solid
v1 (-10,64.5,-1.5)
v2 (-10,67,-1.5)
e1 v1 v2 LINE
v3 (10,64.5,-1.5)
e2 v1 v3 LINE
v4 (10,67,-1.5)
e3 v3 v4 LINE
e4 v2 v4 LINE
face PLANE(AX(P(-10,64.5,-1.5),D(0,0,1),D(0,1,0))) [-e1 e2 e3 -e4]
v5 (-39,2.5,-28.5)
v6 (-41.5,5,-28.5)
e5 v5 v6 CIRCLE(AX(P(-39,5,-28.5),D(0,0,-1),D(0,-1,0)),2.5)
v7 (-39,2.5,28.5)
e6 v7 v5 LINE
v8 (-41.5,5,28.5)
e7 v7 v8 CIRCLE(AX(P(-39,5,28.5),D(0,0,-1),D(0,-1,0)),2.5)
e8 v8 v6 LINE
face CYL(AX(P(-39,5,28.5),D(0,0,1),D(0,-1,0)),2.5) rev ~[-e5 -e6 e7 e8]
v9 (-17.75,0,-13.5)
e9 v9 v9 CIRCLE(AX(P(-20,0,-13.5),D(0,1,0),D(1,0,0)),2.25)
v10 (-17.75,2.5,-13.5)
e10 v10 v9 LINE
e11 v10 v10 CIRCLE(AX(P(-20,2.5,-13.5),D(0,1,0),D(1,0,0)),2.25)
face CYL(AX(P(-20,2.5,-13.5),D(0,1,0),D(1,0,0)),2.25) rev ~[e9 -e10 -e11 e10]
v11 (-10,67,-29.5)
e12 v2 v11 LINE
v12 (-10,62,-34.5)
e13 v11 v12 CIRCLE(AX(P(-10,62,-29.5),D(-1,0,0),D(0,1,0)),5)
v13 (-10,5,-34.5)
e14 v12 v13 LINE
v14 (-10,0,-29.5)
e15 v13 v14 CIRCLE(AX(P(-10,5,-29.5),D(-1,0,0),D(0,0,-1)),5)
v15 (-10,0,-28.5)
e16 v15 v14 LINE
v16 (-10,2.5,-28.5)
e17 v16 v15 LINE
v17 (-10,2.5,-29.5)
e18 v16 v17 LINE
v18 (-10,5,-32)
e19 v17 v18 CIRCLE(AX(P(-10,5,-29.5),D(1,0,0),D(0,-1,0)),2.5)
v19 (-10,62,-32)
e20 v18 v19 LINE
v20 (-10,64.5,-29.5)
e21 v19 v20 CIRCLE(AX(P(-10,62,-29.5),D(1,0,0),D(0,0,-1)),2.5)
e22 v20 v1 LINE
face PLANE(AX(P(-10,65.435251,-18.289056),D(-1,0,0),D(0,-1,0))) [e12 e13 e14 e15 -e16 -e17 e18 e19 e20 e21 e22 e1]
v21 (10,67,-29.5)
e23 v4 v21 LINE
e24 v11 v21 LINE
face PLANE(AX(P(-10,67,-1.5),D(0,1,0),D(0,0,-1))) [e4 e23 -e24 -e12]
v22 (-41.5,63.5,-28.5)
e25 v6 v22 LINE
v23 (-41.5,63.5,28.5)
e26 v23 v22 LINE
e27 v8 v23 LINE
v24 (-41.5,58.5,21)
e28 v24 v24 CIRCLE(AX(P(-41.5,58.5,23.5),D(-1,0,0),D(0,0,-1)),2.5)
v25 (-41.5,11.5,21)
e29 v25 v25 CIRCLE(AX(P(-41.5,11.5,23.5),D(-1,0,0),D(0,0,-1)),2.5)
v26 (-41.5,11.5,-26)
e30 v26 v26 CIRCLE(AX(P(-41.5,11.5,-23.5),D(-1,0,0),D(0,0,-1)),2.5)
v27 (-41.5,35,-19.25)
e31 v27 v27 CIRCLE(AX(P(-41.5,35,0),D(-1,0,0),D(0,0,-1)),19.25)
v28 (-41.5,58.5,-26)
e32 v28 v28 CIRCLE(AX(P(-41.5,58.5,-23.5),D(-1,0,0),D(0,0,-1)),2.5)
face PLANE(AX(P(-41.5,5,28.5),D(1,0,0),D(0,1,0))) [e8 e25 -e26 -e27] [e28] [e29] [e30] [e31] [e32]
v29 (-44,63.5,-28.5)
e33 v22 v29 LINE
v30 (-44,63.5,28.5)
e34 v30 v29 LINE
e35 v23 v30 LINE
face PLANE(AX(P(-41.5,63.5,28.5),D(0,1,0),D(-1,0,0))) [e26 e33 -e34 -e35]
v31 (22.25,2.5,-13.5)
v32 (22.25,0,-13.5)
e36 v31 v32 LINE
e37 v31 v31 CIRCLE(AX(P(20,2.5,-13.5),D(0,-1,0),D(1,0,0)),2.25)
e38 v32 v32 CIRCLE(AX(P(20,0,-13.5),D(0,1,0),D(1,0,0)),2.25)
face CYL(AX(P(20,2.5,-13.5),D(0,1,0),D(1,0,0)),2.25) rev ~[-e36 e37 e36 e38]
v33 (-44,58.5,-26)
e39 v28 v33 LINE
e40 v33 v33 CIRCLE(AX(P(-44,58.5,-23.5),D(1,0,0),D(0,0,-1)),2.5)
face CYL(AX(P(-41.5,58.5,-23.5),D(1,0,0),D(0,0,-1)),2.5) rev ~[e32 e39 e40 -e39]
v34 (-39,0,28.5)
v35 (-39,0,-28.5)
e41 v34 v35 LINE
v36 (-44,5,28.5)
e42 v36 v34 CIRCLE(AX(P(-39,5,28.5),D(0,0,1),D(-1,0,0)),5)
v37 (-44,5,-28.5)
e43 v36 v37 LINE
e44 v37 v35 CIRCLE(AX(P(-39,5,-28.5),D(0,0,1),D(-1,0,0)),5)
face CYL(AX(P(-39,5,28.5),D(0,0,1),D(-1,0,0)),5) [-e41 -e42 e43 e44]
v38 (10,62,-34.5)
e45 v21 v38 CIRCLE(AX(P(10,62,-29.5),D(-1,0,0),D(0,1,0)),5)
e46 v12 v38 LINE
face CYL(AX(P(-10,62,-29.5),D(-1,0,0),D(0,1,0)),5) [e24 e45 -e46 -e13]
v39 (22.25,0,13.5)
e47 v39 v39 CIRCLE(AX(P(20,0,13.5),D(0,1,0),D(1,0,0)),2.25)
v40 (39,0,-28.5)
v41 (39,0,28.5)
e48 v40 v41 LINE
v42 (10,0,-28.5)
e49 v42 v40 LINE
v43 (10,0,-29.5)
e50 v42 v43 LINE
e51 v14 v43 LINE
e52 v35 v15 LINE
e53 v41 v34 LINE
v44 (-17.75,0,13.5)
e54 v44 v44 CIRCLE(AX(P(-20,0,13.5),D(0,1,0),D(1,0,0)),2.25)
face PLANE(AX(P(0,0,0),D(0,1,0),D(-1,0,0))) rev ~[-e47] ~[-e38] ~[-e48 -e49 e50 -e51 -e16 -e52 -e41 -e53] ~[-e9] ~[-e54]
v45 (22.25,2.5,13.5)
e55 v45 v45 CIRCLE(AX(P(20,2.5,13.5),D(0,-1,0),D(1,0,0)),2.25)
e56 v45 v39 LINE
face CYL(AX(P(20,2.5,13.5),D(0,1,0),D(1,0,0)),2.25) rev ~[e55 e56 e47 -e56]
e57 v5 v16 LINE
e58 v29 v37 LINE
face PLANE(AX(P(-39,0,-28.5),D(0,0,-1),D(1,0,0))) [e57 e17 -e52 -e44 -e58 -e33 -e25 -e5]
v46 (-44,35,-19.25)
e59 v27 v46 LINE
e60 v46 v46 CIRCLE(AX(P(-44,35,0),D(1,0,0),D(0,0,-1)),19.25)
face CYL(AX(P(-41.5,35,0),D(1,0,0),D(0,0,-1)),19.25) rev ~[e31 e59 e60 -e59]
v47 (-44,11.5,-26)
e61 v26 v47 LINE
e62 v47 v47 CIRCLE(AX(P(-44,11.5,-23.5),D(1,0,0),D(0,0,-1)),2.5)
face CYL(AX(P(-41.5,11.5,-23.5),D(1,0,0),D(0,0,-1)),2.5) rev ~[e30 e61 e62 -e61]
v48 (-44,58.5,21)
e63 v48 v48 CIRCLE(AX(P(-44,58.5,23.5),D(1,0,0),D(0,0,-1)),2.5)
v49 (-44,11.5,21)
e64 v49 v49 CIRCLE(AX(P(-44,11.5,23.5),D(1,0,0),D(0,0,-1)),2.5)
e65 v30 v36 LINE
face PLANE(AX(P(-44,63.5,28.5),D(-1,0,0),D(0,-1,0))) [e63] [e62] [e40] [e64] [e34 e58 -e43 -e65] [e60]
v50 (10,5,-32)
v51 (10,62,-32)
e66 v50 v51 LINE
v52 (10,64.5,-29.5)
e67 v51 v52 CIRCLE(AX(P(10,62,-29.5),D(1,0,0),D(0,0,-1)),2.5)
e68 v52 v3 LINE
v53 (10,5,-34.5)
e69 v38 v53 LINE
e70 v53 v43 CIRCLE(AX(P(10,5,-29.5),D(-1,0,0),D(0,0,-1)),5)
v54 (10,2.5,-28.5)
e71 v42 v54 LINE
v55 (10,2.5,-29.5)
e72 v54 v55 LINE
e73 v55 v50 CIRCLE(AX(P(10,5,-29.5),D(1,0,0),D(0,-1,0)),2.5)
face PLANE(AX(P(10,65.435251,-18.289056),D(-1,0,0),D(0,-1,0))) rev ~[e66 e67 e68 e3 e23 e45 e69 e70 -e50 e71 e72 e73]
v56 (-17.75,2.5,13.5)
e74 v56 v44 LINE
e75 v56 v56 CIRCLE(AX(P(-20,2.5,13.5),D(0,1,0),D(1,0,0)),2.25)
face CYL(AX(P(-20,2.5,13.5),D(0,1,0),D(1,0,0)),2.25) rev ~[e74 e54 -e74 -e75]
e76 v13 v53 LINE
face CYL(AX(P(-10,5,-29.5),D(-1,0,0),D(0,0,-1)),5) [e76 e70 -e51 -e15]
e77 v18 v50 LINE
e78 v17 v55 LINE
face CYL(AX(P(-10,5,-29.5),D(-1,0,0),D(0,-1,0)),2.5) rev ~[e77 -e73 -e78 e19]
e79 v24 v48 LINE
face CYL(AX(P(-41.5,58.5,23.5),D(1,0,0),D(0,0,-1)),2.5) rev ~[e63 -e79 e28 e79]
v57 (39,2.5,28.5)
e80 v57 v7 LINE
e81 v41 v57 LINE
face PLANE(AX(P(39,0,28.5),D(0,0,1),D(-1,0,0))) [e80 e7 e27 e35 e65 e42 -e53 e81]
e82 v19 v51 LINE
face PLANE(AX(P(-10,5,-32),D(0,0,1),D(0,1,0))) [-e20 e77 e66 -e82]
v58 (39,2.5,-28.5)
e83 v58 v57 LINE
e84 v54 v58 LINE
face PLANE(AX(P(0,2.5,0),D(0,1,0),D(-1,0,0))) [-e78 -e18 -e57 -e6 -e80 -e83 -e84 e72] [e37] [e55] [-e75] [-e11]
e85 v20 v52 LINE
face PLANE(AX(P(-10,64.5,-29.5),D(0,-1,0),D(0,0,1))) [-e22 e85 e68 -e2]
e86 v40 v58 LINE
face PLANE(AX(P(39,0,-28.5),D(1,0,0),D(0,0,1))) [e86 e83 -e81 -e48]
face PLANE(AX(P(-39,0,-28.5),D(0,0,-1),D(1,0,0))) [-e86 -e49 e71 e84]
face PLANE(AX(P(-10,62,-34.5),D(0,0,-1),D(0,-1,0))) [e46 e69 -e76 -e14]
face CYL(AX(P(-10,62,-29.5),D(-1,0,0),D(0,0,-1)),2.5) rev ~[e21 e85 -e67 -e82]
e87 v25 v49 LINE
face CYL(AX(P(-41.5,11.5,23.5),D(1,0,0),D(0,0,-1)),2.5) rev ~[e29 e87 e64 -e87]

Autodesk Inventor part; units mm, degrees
ref_plane "YZ Plane" through (0, 0, 0) normal (1, 0, 0) x (0, 1, 0)
ref_plane "XZ Plane" through (0, 0, 0) normal (0, 1, 0) x (-1, 0, 0)
ref_plane "XY Plane" through (0, 0, 0) normal (0, 0, 1) x (1, 0, 0)
sketch "Sketch1" plane through (0, 0, 0) normal (0, 1, 0) x (-1, 0, 0)
  line L0 (39, -28.5) -> (-39, -28.5)
  line L1 (-39, -28.5) -> (-39, 28.5)
  line L2 (-39, 28.5) -> (39, 28.5)
  line L3 (39, 28.5) -> (39, -28.5)
  line L4 (39, -28.5) -> (-39, 28.5) construction
  line L5 (-39, -28.5) -> (39, 28.5) construction
  point P0 (0, 0)
  dimension "d0" = 78
  dimension "d1" = 57
extrude "Plate1" add sketch "Sketch1" along normal blind 2.5
sketch "Sketch2" plane through (-41.5, 5, 28.5) normal (-1, 0, 0) x (0, -1, 0)
  line L0 (0, -57) -> (0, 0)
  line L1 (0, 0) -> (-58.5, 0)
  line L2 (-58.5, 0) -> (-58.5, -57)
  line L3 (-58.5, -57) -> (0, -57)
edge flange "Flange1" height 63.5 angle 90 thickness 2.5 bend radius 2.5 thickness toward (-1, 0, 0) relief tear relief width 2.5 relief depth 1.25 edges at (-39, 2.5, 0) wall of the first edge with corners at (-41.5, 5, -28.5) (-41.5, 5, 28.5) (-41.5, 63.5, 28.5) (-41.5, 63.5, -28.5)
bend "Bend1"
corner "Corner1"
sketch "Sketch3" plane through (-41.5, 63.5, 28.5) normal (1, 0, 0) x (0, 0, -1)
  line L0 (57, 0) -> (57, -58.5) projected
  line L1 (0, 0) -> (57, 0)
  line L2 (57, 0) -> (57, -57)
  line L3 (57, -57) -> (0, -57)
  line L4 (0, -57) -> (0, 0)
  line L5 (0, 0) -> (57, -57)
  circle A0 centre (28.5, -28.5) radius 19.25
  line L6 (0, 0) -> (5, 0)
  line L7 (57, 0) -> (0, 0) projected
  line L8 (5, 0) -> (5, -5)
  line L9 (57, 0) -> (52, 0)
  line L10 (52, 0) -> (52, -5)
  line L11 (57, -57) -> (52, -57)
  line L12 (52, -57) -> (52, -52)
  line L13 (0, -57) -> (5, -57)
  line L14 (5, -57) -> (5, -52)
  circle A1 centre (5, -52) radius 2.5
  circle A2 centre (52, -52) radius 2.5
  circle A3 centre (52, -5) radius 2.5
  circle A4 centre (5, -5) radius 2.5
  point P0 (28.5, -63.5)
  dimension "d13" = 57
  dimension "d14" = 38.5
  dimension "d15" = 5
  dimension "d16" = 5
  dimension "d17" = 5
  dimension "d18" = 5
  dimension "d19" = 5
  dimension "d20" = 5
  dimension "d21" = 5
  dimension "d22" = 5
  dimension "d23" = 5
  dimension "d24" = 5
  dimension "d25" = 5
  dimension "d26" = 5
extrude "Cut1" cut sketch "Sketch3" against normal blind 2.5 contours A2 L12 L5 | L5 A2 | A2 L5 L12 | A4 L5 L8 | L8 L5 A4 | L5 A4 | A0 L5 | L5 A0 | A1 | A3
sketch "Sketch4" plane through (39, 0, -28.5) normal (0, 0, -1) x (-1, 0, 0)
  line L0 (39, 0) -> (29, 0)
  line L1 (78, 0) -> (0, 0) projected
  line L2 (29, 0) -> (29, 2.5)
  line L3 (78, 2.5) -> (0, 2.5) projected
  line L4 (29, 2.5) -> (49, 2.5)
  line L5 (49, 2.5) -> (49, 0)
  line L6 (49, 0) -> (29, 0)
  line L7 (29, 0) -> (29, 2.5)
  dimension "d29" = 10
  dimension "d30" = 20
extrude "Extrusion1" add sketch "Sketch4" along normal blind 1
sketch "Sketch5" plane through (-10, 5, -32) normal (0, 0, -1) x (-1, 0, 0)
  line L0 (-20, 0) -> (0, 0)
  line L1 (0, 0) -> (0, 57)
  line L2 (0, 57) -> (-20, 57)
  line L3 (-20, 57) -> (-20, 0)
edge flange "Flange2" height 62 angle 90 thickness 2.5 bend radius 2.5 thickness toward (0, 0, -1) relief tear relief width 2.5 relief depth 1.25 edges at (0, 2.5, -29.5) wall of the first edge with corners at (10, 5, -32) (-10, 5, -32) (-10, 62, -32) (10, 62, -32)
bend "Bend2"
corner "Corner2"
sketch "Sketch6" plane through (-10, 64.5, -29.5) normal (0, 1, 0) x (-1, 0, 0)
  line L0 (-20, 0) -> (0, 0)
  line L1 (0, 0) -> (0, 28)
  line L2 (0, 28) -> (-20, 28)
  line L3 (-20, 28) -> (-20, 0)
edge flange "Flange3" height 33 angle 90 thickness 2.5 bend radius 2.5 thickness toward (0, 1, 0) relief tear relief width 2.5 relief depth 1.25 edges at (0, 62, -32) wall of the first edge with corners at (10, 64.5, -29.5) (-10, 64.5, -29.5) (-10, 64.5, -1.5) (10, 64.5, -1.5)
bend "Bend3"
corner "Corner3"
sketch "Sketch7" plane through (0, 2.5, 0) normal (0, 1, 0) x (1, 0, 0)
  line L0 (39, -28.5) -> (-39, -28.5) projected
  line L1 (0, -28.5) -> (0, -13.5)
  line L2 (0, -13.5) -> (20, -13.5)
  line L3 (0, -13.5) -> (-20, -13.5)
  circle A0 centre (-20, -13.5) radius 2.25
  circle A1 centre (20, -13.5) radius 2.25
  line L4 (0, -13.5) -> (0, 13.5)
  line L5 (0, 13.5) -> (20, 13.5)
  line L6 (0, 13.5) -> (-20, 13.5)
  circle A2 centre (-20, 13.5) radius 2.25
  circle A3 centre (20, 13.5) radius 2.25
  point P0 (0, 0)
  dimension "d53" = 15
  dimension "d54" = 20
  dimension "d55" = 20
  dimension "d56" = 4.5
  dimension "d57" = 4.5
  dimension "d58" = 27
  dimension "d59" = 20
  dimension "d60" = 20
  dimension "d61" = 4.5
  dimension "d62" = 4.5
extrude "Cut2" cut sketch "Sketch7" against normal blind 2.5
equation "\"d27\" = Thickness"
equation "\"d63\" = Thickness"
equation "\"d3\" = BendReliefWidth"
equation "\"d4\" = BendReliefDepth"
equation "\"d5\" = MinimumRemnant"
equation "\"d6\" = BendRadius"
equation "\"d9\" = BendRadius"
equation "\"d10\" = CornerReliefSize"
equation "\"d11\" = GapSize"
equation "\"d12\" = JacobiRadiusSize"
equation "\"d33\" = BendReliefWidth"
equation "\"d34\" = BendReliefDepth"
equation "\"d35\" = MinimumRemnant"
equation "\"d36\" = BendRadius"
equation "\"d39\" = BendRadius"
equation "\"d40\" = CornerReliefSize"
equation "\"d41\" = GapSize"
equation "\"d42\" = JacobiRadiusSize"
equation "\"d43\" = BendReliefWidth"
equation "\"d44\" = BendReliefDepth"
equation "\"d45\" = MinimumRemnant"
equation "\"d46\" = BendRadius"
equation "\"d49\" = BendRadius"
equation "\"d50\" = CornerReliefSize"
equation "\"d51\" = GapSize"
equation "\"d52\" = JacobiRadiusSize"
equation "\"BendRadius\" = Thickness"
equation "\"BendReliefWidth\" = Thickness"
equation "\"BendReliefDepth\" = 0.5 * Thickness"
equation "\"MinimumRemnant\" = 2 * Thickness"
equation "\"TransitionRadius\" = BendRadius"
equation "\"JacobiRadiusSize\" = BendRadius"
equation "\"GapSize\" = Thickness"
equation "\"d2\" = BendRadius"
equation "\"Thickness\" = 2.5"
equation "\"CornerReliefSize\" = 10"
properties part number "MotorClamptwo" material "Steel, Mild"
